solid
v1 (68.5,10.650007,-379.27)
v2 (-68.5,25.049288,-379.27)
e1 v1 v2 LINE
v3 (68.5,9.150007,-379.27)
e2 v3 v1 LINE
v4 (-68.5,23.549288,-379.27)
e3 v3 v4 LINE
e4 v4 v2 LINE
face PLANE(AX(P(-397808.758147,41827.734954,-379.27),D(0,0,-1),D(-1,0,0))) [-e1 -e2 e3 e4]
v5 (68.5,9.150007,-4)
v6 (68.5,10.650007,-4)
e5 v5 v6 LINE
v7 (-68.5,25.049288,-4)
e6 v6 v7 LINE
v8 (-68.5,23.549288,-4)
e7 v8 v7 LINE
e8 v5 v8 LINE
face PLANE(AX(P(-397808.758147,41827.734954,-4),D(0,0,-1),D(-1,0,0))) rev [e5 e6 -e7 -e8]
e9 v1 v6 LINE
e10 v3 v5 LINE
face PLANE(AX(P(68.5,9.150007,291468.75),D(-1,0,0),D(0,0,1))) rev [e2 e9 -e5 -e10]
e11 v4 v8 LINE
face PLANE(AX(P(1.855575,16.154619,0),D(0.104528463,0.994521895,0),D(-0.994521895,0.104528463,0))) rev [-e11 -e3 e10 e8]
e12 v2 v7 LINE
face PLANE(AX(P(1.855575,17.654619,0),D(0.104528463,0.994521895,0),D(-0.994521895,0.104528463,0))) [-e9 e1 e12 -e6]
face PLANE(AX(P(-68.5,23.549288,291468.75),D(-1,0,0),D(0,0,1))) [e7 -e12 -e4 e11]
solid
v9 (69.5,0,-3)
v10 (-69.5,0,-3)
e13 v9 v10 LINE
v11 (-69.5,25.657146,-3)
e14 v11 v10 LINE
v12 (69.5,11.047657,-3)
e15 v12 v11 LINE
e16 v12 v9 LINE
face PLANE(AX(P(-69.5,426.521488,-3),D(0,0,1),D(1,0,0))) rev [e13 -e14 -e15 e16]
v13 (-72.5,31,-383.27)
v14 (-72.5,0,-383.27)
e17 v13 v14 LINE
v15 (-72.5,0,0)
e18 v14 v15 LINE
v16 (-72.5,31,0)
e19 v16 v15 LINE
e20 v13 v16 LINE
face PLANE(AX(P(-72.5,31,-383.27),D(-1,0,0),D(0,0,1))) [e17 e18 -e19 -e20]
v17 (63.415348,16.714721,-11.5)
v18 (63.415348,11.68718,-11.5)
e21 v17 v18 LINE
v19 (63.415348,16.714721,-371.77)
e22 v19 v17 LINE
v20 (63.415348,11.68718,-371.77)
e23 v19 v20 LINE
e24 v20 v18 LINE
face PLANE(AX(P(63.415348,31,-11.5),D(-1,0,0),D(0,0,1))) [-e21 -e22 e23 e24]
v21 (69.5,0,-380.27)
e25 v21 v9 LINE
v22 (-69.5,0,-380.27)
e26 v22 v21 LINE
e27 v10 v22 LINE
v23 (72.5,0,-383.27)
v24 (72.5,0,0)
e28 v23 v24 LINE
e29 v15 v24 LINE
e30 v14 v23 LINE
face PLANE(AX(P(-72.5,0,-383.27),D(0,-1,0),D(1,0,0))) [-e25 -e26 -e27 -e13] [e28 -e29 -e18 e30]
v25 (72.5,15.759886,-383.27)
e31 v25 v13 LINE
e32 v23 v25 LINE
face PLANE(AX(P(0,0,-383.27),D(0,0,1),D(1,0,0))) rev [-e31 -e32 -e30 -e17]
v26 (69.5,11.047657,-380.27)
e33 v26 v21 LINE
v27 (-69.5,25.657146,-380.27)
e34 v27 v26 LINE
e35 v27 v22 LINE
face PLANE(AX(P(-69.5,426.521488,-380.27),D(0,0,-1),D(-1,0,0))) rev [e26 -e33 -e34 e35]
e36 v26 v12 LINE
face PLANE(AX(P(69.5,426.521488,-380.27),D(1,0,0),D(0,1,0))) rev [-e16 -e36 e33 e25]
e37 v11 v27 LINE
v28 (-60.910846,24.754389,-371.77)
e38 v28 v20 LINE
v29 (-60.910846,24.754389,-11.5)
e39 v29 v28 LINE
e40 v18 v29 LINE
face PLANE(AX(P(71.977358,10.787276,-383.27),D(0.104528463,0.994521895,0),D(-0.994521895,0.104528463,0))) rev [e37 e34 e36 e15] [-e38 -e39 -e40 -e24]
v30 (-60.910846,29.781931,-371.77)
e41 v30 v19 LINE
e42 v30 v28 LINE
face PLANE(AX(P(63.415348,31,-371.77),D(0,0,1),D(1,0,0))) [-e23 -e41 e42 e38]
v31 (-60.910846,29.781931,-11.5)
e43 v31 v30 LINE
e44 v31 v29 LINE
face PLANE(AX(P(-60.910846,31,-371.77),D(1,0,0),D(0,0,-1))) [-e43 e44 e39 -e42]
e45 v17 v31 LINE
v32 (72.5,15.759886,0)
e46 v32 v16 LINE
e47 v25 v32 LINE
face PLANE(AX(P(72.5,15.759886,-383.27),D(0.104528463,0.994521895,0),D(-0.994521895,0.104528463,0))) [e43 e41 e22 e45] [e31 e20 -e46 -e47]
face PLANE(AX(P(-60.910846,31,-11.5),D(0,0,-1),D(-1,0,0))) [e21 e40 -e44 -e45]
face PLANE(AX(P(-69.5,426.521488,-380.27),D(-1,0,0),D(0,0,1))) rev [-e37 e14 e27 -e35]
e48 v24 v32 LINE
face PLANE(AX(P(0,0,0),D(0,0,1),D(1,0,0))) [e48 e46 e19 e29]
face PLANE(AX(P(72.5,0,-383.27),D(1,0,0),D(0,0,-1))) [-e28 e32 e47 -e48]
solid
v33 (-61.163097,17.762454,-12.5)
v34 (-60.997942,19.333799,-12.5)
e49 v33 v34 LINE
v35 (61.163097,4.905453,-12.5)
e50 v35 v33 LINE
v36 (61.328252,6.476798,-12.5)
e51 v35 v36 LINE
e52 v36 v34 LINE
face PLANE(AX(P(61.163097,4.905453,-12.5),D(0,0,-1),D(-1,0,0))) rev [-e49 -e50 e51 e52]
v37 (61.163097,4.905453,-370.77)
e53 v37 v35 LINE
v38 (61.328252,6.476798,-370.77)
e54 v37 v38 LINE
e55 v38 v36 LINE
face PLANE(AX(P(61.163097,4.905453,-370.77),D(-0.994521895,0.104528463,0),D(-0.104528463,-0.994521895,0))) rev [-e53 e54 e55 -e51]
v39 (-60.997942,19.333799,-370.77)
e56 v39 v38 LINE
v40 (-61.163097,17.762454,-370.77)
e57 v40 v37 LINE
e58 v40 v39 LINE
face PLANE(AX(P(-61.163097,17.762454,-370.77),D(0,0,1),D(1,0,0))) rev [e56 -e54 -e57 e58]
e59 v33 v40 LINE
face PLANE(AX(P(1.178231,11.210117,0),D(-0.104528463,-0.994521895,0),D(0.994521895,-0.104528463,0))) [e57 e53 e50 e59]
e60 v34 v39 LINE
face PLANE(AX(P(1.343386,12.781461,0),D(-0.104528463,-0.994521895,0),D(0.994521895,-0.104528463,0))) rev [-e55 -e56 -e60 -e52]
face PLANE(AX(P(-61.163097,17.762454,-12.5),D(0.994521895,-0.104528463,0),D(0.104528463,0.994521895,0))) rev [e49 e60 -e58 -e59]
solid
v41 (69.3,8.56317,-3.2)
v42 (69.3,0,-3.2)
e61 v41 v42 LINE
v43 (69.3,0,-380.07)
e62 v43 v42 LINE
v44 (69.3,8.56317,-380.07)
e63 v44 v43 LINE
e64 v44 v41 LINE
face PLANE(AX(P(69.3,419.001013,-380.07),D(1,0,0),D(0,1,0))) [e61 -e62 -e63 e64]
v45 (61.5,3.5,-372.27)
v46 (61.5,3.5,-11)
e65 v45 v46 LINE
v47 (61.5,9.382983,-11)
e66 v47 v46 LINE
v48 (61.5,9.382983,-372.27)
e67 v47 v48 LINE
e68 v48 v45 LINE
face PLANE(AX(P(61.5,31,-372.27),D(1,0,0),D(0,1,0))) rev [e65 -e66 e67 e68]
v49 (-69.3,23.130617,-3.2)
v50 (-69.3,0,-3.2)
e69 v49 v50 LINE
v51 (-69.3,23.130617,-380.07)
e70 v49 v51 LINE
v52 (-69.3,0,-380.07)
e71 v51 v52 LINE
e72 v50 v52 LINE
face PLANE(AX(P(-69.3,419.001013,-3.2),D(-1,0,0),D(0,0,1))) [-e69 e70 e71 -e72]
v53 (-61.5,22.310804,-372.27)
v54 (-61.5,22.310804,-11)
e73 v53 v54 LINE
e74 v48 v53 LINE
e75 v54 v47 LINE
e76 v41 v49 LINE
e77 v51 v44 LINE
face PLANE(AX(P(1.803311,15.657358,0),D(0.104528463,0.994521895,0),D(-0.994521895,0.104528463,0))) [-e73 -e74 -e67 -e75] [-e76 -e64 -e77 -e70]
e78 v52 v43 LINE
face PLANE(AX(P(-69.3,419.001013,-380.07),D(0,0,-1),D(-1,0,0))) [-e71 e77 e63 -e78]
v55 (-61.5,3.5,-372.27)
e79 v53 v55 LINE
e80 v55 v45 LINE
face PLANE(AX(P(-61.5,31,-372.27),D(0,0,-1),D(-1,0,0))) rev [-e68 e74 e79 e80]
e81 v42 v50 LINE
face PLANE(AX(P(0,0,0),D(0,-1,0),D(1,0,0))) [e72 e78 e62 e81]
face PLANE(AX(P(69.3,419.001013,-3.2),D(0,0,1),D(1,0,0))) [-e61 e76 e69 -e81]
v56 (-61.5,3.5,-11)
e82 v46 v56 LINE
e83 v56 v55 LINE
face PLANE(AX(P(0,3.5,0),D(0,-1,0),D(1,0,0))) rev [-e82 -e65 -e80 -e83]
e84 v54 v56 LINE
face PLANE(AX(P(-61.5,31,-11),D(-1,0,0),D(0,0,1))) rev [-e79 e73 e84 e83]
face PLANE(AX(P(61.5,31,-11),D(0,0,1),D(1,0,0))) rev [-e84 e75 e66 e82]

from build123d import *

# Parameters (mm, degrees)
TOP_CASE_MAIN_DEPTH         = 383.27
TOP_CASE_CUT_REACH          = 393.297
SKETCH17_W                  = 139
SKETCH17_H                  = 377.27
TOP_PLATE_AND_RETENTION_W   = 124.32619313
TOP_PLATE_AND_RETENTION_H   = 360.27
TOP_CASE_CUT_EXTRUDE3_DEPTH = 392.278198101
PCB_SKETCH_W                = 123
PCB_SKETCH_H                = 358.27
PCB_MAIN_DEPTH              = 1.58
TOP_START                   = -379.27
TOP_PLATE_DEPTH             = 375.27
BASE_CASE_MAIN_REACH        = 393.297
SKETCH21_W                  = 138.6
SKETCH21_H                  = 376.87
CUT_EXTRUDE2_START          = -3.5
SKETCH24_W                  = 123
SKETCH24_H                  = 361.27
CUT_EXTRUDE2_DEPTH          = 388.796745323


# Read off the part's stored shape, not the designer's step: top plate
with BuildPart() as part:
    # side profile → top case main (new body)
    with BuildSketch(Plane.XY):
        Polygon((-72.5, 0), (72.5, 0), (72.5, 15.759885886), (-72.5, 31), align=None)
    extrude(amount=-TOP_CASE_MAIN_DEPTH)

    # top case cut: up to this plane
    top_case_cut_end = Plane(origin=(71.977357684, 10.78727641, -383.27), z_dir=(0.10452846326764624, 0.9945218953682741, 0))
    # Sketch17 → top case cut (cut, up to the surface)
    with BuildSketch(Plane.XZ, mode=Mode.PRIVATE) as top_case_cut_sk1:
        with Locations((0, -191.635)):
            Rectangle(SKETCH17_W, SKETCH17_H)
    top_case_cut_tool1 = split(extrude(top_case_cut_sk1.sketch, amount=-TOP_CASE_CUT_REACH, mode=Mode.PRIVATE), bisect_by=top_case_cut_end, keep=Keep.BOTH, mode=Mode.PRIVATE)
    add(top_case_cut_tool1.solids().sort_by_distance((0, 0, -191.635))[0], mode=Mode.SUBTRACT)

    # top plate and retention → top case Cut-Extrude3 (cut, through all)
    with BuildSketch(Plane(origin=(0.919925149, 2.5, 0), x_dir=(1, 0, 0), z_dir=(0, 1, 0))):
        with Locations((0.332325841, 191.635)):
            Rectangle(TOP_PLATE_AND_RETENTION_W, TOP_PLATE_AND_RETENTION_H)
    extrude(amount=TOP_CASE_CUT_EXTRUDE3_DEPTH, mode=Mode.SUBTRACT)


with BuildPart() as body_2:
    # pcb sketch → pcb main (new body)
    with BuildSketch(Plane(origin=(1.343385716, 12.781461307, 0), x_dir=(0.9945218953682741, -0.10452846326764635, 0), z_dir=(-0.10452846326764635, -0.9945218953682741, 0))):
        with Locations((-1.184720769, -191.635)):
            Rectangle(PCB_SKETCH_W, PCB_SKETCH_H)
    extrude(amount=PCB_MAIN_DEPTH)


with BuildPart() as body_3:
    # top plate outline → top plate (new body)
    with BuildSketch(Plane.XY.offset(TOP_START)):
        Polygon((68.5, 9.15000729), (68.5, 10.65000729), (-68.5, 25.049287521), (-68.5, 23.549287521), align=None)
    extrude(amount=TOP_PLATE_DEPTH)


with BuildPart() as body_4:
    # base case main: up to this plane
    base_case_main_end = Plane(origin=(1.803310955, 15.657357647, 0), z_dir=(0.10452846326764625, 0.9945218953682742, 0))
    # Sketch21 → base case main (new, up to the surface)
    with BuildSketch(Plane.XZ, mode=Mode.PRIVATE) as base_case_main_sk1:
        with Locations((0, -191.635)):
            Rectangle(SKETCH21_W, SKETCH21_H)
    base_case_main_tool1 = split(extrude(base_case_main_sk1.sketch, amount=-BASE_CASE_MAIN_REACH, mode=Mode.PRIVATE), bisect_by=base_case_main_end, keep=Keep.BOTH, mode=Mode.PRIVATE)
    add(base_case_main_tool1.solids().sort_by_distance((0, 0, -191.635))[0])

    # Sketch24 → Cut-Extrude2 (cut, through all)
    with BuildSketch(Plane.XZ.offset(CUT_EXTRUDE2_START)):
        with Locations((0, -191.635)):
            Rectangle(SKETCH24_W, SKETCH24_H)
    extrude(amount=-CUT_EXTRUDE2_DEPTH, mode=Mode.SUBTRACT)


solid = Compound([part.part, body_2.part, body_3.part, body_4.part])
